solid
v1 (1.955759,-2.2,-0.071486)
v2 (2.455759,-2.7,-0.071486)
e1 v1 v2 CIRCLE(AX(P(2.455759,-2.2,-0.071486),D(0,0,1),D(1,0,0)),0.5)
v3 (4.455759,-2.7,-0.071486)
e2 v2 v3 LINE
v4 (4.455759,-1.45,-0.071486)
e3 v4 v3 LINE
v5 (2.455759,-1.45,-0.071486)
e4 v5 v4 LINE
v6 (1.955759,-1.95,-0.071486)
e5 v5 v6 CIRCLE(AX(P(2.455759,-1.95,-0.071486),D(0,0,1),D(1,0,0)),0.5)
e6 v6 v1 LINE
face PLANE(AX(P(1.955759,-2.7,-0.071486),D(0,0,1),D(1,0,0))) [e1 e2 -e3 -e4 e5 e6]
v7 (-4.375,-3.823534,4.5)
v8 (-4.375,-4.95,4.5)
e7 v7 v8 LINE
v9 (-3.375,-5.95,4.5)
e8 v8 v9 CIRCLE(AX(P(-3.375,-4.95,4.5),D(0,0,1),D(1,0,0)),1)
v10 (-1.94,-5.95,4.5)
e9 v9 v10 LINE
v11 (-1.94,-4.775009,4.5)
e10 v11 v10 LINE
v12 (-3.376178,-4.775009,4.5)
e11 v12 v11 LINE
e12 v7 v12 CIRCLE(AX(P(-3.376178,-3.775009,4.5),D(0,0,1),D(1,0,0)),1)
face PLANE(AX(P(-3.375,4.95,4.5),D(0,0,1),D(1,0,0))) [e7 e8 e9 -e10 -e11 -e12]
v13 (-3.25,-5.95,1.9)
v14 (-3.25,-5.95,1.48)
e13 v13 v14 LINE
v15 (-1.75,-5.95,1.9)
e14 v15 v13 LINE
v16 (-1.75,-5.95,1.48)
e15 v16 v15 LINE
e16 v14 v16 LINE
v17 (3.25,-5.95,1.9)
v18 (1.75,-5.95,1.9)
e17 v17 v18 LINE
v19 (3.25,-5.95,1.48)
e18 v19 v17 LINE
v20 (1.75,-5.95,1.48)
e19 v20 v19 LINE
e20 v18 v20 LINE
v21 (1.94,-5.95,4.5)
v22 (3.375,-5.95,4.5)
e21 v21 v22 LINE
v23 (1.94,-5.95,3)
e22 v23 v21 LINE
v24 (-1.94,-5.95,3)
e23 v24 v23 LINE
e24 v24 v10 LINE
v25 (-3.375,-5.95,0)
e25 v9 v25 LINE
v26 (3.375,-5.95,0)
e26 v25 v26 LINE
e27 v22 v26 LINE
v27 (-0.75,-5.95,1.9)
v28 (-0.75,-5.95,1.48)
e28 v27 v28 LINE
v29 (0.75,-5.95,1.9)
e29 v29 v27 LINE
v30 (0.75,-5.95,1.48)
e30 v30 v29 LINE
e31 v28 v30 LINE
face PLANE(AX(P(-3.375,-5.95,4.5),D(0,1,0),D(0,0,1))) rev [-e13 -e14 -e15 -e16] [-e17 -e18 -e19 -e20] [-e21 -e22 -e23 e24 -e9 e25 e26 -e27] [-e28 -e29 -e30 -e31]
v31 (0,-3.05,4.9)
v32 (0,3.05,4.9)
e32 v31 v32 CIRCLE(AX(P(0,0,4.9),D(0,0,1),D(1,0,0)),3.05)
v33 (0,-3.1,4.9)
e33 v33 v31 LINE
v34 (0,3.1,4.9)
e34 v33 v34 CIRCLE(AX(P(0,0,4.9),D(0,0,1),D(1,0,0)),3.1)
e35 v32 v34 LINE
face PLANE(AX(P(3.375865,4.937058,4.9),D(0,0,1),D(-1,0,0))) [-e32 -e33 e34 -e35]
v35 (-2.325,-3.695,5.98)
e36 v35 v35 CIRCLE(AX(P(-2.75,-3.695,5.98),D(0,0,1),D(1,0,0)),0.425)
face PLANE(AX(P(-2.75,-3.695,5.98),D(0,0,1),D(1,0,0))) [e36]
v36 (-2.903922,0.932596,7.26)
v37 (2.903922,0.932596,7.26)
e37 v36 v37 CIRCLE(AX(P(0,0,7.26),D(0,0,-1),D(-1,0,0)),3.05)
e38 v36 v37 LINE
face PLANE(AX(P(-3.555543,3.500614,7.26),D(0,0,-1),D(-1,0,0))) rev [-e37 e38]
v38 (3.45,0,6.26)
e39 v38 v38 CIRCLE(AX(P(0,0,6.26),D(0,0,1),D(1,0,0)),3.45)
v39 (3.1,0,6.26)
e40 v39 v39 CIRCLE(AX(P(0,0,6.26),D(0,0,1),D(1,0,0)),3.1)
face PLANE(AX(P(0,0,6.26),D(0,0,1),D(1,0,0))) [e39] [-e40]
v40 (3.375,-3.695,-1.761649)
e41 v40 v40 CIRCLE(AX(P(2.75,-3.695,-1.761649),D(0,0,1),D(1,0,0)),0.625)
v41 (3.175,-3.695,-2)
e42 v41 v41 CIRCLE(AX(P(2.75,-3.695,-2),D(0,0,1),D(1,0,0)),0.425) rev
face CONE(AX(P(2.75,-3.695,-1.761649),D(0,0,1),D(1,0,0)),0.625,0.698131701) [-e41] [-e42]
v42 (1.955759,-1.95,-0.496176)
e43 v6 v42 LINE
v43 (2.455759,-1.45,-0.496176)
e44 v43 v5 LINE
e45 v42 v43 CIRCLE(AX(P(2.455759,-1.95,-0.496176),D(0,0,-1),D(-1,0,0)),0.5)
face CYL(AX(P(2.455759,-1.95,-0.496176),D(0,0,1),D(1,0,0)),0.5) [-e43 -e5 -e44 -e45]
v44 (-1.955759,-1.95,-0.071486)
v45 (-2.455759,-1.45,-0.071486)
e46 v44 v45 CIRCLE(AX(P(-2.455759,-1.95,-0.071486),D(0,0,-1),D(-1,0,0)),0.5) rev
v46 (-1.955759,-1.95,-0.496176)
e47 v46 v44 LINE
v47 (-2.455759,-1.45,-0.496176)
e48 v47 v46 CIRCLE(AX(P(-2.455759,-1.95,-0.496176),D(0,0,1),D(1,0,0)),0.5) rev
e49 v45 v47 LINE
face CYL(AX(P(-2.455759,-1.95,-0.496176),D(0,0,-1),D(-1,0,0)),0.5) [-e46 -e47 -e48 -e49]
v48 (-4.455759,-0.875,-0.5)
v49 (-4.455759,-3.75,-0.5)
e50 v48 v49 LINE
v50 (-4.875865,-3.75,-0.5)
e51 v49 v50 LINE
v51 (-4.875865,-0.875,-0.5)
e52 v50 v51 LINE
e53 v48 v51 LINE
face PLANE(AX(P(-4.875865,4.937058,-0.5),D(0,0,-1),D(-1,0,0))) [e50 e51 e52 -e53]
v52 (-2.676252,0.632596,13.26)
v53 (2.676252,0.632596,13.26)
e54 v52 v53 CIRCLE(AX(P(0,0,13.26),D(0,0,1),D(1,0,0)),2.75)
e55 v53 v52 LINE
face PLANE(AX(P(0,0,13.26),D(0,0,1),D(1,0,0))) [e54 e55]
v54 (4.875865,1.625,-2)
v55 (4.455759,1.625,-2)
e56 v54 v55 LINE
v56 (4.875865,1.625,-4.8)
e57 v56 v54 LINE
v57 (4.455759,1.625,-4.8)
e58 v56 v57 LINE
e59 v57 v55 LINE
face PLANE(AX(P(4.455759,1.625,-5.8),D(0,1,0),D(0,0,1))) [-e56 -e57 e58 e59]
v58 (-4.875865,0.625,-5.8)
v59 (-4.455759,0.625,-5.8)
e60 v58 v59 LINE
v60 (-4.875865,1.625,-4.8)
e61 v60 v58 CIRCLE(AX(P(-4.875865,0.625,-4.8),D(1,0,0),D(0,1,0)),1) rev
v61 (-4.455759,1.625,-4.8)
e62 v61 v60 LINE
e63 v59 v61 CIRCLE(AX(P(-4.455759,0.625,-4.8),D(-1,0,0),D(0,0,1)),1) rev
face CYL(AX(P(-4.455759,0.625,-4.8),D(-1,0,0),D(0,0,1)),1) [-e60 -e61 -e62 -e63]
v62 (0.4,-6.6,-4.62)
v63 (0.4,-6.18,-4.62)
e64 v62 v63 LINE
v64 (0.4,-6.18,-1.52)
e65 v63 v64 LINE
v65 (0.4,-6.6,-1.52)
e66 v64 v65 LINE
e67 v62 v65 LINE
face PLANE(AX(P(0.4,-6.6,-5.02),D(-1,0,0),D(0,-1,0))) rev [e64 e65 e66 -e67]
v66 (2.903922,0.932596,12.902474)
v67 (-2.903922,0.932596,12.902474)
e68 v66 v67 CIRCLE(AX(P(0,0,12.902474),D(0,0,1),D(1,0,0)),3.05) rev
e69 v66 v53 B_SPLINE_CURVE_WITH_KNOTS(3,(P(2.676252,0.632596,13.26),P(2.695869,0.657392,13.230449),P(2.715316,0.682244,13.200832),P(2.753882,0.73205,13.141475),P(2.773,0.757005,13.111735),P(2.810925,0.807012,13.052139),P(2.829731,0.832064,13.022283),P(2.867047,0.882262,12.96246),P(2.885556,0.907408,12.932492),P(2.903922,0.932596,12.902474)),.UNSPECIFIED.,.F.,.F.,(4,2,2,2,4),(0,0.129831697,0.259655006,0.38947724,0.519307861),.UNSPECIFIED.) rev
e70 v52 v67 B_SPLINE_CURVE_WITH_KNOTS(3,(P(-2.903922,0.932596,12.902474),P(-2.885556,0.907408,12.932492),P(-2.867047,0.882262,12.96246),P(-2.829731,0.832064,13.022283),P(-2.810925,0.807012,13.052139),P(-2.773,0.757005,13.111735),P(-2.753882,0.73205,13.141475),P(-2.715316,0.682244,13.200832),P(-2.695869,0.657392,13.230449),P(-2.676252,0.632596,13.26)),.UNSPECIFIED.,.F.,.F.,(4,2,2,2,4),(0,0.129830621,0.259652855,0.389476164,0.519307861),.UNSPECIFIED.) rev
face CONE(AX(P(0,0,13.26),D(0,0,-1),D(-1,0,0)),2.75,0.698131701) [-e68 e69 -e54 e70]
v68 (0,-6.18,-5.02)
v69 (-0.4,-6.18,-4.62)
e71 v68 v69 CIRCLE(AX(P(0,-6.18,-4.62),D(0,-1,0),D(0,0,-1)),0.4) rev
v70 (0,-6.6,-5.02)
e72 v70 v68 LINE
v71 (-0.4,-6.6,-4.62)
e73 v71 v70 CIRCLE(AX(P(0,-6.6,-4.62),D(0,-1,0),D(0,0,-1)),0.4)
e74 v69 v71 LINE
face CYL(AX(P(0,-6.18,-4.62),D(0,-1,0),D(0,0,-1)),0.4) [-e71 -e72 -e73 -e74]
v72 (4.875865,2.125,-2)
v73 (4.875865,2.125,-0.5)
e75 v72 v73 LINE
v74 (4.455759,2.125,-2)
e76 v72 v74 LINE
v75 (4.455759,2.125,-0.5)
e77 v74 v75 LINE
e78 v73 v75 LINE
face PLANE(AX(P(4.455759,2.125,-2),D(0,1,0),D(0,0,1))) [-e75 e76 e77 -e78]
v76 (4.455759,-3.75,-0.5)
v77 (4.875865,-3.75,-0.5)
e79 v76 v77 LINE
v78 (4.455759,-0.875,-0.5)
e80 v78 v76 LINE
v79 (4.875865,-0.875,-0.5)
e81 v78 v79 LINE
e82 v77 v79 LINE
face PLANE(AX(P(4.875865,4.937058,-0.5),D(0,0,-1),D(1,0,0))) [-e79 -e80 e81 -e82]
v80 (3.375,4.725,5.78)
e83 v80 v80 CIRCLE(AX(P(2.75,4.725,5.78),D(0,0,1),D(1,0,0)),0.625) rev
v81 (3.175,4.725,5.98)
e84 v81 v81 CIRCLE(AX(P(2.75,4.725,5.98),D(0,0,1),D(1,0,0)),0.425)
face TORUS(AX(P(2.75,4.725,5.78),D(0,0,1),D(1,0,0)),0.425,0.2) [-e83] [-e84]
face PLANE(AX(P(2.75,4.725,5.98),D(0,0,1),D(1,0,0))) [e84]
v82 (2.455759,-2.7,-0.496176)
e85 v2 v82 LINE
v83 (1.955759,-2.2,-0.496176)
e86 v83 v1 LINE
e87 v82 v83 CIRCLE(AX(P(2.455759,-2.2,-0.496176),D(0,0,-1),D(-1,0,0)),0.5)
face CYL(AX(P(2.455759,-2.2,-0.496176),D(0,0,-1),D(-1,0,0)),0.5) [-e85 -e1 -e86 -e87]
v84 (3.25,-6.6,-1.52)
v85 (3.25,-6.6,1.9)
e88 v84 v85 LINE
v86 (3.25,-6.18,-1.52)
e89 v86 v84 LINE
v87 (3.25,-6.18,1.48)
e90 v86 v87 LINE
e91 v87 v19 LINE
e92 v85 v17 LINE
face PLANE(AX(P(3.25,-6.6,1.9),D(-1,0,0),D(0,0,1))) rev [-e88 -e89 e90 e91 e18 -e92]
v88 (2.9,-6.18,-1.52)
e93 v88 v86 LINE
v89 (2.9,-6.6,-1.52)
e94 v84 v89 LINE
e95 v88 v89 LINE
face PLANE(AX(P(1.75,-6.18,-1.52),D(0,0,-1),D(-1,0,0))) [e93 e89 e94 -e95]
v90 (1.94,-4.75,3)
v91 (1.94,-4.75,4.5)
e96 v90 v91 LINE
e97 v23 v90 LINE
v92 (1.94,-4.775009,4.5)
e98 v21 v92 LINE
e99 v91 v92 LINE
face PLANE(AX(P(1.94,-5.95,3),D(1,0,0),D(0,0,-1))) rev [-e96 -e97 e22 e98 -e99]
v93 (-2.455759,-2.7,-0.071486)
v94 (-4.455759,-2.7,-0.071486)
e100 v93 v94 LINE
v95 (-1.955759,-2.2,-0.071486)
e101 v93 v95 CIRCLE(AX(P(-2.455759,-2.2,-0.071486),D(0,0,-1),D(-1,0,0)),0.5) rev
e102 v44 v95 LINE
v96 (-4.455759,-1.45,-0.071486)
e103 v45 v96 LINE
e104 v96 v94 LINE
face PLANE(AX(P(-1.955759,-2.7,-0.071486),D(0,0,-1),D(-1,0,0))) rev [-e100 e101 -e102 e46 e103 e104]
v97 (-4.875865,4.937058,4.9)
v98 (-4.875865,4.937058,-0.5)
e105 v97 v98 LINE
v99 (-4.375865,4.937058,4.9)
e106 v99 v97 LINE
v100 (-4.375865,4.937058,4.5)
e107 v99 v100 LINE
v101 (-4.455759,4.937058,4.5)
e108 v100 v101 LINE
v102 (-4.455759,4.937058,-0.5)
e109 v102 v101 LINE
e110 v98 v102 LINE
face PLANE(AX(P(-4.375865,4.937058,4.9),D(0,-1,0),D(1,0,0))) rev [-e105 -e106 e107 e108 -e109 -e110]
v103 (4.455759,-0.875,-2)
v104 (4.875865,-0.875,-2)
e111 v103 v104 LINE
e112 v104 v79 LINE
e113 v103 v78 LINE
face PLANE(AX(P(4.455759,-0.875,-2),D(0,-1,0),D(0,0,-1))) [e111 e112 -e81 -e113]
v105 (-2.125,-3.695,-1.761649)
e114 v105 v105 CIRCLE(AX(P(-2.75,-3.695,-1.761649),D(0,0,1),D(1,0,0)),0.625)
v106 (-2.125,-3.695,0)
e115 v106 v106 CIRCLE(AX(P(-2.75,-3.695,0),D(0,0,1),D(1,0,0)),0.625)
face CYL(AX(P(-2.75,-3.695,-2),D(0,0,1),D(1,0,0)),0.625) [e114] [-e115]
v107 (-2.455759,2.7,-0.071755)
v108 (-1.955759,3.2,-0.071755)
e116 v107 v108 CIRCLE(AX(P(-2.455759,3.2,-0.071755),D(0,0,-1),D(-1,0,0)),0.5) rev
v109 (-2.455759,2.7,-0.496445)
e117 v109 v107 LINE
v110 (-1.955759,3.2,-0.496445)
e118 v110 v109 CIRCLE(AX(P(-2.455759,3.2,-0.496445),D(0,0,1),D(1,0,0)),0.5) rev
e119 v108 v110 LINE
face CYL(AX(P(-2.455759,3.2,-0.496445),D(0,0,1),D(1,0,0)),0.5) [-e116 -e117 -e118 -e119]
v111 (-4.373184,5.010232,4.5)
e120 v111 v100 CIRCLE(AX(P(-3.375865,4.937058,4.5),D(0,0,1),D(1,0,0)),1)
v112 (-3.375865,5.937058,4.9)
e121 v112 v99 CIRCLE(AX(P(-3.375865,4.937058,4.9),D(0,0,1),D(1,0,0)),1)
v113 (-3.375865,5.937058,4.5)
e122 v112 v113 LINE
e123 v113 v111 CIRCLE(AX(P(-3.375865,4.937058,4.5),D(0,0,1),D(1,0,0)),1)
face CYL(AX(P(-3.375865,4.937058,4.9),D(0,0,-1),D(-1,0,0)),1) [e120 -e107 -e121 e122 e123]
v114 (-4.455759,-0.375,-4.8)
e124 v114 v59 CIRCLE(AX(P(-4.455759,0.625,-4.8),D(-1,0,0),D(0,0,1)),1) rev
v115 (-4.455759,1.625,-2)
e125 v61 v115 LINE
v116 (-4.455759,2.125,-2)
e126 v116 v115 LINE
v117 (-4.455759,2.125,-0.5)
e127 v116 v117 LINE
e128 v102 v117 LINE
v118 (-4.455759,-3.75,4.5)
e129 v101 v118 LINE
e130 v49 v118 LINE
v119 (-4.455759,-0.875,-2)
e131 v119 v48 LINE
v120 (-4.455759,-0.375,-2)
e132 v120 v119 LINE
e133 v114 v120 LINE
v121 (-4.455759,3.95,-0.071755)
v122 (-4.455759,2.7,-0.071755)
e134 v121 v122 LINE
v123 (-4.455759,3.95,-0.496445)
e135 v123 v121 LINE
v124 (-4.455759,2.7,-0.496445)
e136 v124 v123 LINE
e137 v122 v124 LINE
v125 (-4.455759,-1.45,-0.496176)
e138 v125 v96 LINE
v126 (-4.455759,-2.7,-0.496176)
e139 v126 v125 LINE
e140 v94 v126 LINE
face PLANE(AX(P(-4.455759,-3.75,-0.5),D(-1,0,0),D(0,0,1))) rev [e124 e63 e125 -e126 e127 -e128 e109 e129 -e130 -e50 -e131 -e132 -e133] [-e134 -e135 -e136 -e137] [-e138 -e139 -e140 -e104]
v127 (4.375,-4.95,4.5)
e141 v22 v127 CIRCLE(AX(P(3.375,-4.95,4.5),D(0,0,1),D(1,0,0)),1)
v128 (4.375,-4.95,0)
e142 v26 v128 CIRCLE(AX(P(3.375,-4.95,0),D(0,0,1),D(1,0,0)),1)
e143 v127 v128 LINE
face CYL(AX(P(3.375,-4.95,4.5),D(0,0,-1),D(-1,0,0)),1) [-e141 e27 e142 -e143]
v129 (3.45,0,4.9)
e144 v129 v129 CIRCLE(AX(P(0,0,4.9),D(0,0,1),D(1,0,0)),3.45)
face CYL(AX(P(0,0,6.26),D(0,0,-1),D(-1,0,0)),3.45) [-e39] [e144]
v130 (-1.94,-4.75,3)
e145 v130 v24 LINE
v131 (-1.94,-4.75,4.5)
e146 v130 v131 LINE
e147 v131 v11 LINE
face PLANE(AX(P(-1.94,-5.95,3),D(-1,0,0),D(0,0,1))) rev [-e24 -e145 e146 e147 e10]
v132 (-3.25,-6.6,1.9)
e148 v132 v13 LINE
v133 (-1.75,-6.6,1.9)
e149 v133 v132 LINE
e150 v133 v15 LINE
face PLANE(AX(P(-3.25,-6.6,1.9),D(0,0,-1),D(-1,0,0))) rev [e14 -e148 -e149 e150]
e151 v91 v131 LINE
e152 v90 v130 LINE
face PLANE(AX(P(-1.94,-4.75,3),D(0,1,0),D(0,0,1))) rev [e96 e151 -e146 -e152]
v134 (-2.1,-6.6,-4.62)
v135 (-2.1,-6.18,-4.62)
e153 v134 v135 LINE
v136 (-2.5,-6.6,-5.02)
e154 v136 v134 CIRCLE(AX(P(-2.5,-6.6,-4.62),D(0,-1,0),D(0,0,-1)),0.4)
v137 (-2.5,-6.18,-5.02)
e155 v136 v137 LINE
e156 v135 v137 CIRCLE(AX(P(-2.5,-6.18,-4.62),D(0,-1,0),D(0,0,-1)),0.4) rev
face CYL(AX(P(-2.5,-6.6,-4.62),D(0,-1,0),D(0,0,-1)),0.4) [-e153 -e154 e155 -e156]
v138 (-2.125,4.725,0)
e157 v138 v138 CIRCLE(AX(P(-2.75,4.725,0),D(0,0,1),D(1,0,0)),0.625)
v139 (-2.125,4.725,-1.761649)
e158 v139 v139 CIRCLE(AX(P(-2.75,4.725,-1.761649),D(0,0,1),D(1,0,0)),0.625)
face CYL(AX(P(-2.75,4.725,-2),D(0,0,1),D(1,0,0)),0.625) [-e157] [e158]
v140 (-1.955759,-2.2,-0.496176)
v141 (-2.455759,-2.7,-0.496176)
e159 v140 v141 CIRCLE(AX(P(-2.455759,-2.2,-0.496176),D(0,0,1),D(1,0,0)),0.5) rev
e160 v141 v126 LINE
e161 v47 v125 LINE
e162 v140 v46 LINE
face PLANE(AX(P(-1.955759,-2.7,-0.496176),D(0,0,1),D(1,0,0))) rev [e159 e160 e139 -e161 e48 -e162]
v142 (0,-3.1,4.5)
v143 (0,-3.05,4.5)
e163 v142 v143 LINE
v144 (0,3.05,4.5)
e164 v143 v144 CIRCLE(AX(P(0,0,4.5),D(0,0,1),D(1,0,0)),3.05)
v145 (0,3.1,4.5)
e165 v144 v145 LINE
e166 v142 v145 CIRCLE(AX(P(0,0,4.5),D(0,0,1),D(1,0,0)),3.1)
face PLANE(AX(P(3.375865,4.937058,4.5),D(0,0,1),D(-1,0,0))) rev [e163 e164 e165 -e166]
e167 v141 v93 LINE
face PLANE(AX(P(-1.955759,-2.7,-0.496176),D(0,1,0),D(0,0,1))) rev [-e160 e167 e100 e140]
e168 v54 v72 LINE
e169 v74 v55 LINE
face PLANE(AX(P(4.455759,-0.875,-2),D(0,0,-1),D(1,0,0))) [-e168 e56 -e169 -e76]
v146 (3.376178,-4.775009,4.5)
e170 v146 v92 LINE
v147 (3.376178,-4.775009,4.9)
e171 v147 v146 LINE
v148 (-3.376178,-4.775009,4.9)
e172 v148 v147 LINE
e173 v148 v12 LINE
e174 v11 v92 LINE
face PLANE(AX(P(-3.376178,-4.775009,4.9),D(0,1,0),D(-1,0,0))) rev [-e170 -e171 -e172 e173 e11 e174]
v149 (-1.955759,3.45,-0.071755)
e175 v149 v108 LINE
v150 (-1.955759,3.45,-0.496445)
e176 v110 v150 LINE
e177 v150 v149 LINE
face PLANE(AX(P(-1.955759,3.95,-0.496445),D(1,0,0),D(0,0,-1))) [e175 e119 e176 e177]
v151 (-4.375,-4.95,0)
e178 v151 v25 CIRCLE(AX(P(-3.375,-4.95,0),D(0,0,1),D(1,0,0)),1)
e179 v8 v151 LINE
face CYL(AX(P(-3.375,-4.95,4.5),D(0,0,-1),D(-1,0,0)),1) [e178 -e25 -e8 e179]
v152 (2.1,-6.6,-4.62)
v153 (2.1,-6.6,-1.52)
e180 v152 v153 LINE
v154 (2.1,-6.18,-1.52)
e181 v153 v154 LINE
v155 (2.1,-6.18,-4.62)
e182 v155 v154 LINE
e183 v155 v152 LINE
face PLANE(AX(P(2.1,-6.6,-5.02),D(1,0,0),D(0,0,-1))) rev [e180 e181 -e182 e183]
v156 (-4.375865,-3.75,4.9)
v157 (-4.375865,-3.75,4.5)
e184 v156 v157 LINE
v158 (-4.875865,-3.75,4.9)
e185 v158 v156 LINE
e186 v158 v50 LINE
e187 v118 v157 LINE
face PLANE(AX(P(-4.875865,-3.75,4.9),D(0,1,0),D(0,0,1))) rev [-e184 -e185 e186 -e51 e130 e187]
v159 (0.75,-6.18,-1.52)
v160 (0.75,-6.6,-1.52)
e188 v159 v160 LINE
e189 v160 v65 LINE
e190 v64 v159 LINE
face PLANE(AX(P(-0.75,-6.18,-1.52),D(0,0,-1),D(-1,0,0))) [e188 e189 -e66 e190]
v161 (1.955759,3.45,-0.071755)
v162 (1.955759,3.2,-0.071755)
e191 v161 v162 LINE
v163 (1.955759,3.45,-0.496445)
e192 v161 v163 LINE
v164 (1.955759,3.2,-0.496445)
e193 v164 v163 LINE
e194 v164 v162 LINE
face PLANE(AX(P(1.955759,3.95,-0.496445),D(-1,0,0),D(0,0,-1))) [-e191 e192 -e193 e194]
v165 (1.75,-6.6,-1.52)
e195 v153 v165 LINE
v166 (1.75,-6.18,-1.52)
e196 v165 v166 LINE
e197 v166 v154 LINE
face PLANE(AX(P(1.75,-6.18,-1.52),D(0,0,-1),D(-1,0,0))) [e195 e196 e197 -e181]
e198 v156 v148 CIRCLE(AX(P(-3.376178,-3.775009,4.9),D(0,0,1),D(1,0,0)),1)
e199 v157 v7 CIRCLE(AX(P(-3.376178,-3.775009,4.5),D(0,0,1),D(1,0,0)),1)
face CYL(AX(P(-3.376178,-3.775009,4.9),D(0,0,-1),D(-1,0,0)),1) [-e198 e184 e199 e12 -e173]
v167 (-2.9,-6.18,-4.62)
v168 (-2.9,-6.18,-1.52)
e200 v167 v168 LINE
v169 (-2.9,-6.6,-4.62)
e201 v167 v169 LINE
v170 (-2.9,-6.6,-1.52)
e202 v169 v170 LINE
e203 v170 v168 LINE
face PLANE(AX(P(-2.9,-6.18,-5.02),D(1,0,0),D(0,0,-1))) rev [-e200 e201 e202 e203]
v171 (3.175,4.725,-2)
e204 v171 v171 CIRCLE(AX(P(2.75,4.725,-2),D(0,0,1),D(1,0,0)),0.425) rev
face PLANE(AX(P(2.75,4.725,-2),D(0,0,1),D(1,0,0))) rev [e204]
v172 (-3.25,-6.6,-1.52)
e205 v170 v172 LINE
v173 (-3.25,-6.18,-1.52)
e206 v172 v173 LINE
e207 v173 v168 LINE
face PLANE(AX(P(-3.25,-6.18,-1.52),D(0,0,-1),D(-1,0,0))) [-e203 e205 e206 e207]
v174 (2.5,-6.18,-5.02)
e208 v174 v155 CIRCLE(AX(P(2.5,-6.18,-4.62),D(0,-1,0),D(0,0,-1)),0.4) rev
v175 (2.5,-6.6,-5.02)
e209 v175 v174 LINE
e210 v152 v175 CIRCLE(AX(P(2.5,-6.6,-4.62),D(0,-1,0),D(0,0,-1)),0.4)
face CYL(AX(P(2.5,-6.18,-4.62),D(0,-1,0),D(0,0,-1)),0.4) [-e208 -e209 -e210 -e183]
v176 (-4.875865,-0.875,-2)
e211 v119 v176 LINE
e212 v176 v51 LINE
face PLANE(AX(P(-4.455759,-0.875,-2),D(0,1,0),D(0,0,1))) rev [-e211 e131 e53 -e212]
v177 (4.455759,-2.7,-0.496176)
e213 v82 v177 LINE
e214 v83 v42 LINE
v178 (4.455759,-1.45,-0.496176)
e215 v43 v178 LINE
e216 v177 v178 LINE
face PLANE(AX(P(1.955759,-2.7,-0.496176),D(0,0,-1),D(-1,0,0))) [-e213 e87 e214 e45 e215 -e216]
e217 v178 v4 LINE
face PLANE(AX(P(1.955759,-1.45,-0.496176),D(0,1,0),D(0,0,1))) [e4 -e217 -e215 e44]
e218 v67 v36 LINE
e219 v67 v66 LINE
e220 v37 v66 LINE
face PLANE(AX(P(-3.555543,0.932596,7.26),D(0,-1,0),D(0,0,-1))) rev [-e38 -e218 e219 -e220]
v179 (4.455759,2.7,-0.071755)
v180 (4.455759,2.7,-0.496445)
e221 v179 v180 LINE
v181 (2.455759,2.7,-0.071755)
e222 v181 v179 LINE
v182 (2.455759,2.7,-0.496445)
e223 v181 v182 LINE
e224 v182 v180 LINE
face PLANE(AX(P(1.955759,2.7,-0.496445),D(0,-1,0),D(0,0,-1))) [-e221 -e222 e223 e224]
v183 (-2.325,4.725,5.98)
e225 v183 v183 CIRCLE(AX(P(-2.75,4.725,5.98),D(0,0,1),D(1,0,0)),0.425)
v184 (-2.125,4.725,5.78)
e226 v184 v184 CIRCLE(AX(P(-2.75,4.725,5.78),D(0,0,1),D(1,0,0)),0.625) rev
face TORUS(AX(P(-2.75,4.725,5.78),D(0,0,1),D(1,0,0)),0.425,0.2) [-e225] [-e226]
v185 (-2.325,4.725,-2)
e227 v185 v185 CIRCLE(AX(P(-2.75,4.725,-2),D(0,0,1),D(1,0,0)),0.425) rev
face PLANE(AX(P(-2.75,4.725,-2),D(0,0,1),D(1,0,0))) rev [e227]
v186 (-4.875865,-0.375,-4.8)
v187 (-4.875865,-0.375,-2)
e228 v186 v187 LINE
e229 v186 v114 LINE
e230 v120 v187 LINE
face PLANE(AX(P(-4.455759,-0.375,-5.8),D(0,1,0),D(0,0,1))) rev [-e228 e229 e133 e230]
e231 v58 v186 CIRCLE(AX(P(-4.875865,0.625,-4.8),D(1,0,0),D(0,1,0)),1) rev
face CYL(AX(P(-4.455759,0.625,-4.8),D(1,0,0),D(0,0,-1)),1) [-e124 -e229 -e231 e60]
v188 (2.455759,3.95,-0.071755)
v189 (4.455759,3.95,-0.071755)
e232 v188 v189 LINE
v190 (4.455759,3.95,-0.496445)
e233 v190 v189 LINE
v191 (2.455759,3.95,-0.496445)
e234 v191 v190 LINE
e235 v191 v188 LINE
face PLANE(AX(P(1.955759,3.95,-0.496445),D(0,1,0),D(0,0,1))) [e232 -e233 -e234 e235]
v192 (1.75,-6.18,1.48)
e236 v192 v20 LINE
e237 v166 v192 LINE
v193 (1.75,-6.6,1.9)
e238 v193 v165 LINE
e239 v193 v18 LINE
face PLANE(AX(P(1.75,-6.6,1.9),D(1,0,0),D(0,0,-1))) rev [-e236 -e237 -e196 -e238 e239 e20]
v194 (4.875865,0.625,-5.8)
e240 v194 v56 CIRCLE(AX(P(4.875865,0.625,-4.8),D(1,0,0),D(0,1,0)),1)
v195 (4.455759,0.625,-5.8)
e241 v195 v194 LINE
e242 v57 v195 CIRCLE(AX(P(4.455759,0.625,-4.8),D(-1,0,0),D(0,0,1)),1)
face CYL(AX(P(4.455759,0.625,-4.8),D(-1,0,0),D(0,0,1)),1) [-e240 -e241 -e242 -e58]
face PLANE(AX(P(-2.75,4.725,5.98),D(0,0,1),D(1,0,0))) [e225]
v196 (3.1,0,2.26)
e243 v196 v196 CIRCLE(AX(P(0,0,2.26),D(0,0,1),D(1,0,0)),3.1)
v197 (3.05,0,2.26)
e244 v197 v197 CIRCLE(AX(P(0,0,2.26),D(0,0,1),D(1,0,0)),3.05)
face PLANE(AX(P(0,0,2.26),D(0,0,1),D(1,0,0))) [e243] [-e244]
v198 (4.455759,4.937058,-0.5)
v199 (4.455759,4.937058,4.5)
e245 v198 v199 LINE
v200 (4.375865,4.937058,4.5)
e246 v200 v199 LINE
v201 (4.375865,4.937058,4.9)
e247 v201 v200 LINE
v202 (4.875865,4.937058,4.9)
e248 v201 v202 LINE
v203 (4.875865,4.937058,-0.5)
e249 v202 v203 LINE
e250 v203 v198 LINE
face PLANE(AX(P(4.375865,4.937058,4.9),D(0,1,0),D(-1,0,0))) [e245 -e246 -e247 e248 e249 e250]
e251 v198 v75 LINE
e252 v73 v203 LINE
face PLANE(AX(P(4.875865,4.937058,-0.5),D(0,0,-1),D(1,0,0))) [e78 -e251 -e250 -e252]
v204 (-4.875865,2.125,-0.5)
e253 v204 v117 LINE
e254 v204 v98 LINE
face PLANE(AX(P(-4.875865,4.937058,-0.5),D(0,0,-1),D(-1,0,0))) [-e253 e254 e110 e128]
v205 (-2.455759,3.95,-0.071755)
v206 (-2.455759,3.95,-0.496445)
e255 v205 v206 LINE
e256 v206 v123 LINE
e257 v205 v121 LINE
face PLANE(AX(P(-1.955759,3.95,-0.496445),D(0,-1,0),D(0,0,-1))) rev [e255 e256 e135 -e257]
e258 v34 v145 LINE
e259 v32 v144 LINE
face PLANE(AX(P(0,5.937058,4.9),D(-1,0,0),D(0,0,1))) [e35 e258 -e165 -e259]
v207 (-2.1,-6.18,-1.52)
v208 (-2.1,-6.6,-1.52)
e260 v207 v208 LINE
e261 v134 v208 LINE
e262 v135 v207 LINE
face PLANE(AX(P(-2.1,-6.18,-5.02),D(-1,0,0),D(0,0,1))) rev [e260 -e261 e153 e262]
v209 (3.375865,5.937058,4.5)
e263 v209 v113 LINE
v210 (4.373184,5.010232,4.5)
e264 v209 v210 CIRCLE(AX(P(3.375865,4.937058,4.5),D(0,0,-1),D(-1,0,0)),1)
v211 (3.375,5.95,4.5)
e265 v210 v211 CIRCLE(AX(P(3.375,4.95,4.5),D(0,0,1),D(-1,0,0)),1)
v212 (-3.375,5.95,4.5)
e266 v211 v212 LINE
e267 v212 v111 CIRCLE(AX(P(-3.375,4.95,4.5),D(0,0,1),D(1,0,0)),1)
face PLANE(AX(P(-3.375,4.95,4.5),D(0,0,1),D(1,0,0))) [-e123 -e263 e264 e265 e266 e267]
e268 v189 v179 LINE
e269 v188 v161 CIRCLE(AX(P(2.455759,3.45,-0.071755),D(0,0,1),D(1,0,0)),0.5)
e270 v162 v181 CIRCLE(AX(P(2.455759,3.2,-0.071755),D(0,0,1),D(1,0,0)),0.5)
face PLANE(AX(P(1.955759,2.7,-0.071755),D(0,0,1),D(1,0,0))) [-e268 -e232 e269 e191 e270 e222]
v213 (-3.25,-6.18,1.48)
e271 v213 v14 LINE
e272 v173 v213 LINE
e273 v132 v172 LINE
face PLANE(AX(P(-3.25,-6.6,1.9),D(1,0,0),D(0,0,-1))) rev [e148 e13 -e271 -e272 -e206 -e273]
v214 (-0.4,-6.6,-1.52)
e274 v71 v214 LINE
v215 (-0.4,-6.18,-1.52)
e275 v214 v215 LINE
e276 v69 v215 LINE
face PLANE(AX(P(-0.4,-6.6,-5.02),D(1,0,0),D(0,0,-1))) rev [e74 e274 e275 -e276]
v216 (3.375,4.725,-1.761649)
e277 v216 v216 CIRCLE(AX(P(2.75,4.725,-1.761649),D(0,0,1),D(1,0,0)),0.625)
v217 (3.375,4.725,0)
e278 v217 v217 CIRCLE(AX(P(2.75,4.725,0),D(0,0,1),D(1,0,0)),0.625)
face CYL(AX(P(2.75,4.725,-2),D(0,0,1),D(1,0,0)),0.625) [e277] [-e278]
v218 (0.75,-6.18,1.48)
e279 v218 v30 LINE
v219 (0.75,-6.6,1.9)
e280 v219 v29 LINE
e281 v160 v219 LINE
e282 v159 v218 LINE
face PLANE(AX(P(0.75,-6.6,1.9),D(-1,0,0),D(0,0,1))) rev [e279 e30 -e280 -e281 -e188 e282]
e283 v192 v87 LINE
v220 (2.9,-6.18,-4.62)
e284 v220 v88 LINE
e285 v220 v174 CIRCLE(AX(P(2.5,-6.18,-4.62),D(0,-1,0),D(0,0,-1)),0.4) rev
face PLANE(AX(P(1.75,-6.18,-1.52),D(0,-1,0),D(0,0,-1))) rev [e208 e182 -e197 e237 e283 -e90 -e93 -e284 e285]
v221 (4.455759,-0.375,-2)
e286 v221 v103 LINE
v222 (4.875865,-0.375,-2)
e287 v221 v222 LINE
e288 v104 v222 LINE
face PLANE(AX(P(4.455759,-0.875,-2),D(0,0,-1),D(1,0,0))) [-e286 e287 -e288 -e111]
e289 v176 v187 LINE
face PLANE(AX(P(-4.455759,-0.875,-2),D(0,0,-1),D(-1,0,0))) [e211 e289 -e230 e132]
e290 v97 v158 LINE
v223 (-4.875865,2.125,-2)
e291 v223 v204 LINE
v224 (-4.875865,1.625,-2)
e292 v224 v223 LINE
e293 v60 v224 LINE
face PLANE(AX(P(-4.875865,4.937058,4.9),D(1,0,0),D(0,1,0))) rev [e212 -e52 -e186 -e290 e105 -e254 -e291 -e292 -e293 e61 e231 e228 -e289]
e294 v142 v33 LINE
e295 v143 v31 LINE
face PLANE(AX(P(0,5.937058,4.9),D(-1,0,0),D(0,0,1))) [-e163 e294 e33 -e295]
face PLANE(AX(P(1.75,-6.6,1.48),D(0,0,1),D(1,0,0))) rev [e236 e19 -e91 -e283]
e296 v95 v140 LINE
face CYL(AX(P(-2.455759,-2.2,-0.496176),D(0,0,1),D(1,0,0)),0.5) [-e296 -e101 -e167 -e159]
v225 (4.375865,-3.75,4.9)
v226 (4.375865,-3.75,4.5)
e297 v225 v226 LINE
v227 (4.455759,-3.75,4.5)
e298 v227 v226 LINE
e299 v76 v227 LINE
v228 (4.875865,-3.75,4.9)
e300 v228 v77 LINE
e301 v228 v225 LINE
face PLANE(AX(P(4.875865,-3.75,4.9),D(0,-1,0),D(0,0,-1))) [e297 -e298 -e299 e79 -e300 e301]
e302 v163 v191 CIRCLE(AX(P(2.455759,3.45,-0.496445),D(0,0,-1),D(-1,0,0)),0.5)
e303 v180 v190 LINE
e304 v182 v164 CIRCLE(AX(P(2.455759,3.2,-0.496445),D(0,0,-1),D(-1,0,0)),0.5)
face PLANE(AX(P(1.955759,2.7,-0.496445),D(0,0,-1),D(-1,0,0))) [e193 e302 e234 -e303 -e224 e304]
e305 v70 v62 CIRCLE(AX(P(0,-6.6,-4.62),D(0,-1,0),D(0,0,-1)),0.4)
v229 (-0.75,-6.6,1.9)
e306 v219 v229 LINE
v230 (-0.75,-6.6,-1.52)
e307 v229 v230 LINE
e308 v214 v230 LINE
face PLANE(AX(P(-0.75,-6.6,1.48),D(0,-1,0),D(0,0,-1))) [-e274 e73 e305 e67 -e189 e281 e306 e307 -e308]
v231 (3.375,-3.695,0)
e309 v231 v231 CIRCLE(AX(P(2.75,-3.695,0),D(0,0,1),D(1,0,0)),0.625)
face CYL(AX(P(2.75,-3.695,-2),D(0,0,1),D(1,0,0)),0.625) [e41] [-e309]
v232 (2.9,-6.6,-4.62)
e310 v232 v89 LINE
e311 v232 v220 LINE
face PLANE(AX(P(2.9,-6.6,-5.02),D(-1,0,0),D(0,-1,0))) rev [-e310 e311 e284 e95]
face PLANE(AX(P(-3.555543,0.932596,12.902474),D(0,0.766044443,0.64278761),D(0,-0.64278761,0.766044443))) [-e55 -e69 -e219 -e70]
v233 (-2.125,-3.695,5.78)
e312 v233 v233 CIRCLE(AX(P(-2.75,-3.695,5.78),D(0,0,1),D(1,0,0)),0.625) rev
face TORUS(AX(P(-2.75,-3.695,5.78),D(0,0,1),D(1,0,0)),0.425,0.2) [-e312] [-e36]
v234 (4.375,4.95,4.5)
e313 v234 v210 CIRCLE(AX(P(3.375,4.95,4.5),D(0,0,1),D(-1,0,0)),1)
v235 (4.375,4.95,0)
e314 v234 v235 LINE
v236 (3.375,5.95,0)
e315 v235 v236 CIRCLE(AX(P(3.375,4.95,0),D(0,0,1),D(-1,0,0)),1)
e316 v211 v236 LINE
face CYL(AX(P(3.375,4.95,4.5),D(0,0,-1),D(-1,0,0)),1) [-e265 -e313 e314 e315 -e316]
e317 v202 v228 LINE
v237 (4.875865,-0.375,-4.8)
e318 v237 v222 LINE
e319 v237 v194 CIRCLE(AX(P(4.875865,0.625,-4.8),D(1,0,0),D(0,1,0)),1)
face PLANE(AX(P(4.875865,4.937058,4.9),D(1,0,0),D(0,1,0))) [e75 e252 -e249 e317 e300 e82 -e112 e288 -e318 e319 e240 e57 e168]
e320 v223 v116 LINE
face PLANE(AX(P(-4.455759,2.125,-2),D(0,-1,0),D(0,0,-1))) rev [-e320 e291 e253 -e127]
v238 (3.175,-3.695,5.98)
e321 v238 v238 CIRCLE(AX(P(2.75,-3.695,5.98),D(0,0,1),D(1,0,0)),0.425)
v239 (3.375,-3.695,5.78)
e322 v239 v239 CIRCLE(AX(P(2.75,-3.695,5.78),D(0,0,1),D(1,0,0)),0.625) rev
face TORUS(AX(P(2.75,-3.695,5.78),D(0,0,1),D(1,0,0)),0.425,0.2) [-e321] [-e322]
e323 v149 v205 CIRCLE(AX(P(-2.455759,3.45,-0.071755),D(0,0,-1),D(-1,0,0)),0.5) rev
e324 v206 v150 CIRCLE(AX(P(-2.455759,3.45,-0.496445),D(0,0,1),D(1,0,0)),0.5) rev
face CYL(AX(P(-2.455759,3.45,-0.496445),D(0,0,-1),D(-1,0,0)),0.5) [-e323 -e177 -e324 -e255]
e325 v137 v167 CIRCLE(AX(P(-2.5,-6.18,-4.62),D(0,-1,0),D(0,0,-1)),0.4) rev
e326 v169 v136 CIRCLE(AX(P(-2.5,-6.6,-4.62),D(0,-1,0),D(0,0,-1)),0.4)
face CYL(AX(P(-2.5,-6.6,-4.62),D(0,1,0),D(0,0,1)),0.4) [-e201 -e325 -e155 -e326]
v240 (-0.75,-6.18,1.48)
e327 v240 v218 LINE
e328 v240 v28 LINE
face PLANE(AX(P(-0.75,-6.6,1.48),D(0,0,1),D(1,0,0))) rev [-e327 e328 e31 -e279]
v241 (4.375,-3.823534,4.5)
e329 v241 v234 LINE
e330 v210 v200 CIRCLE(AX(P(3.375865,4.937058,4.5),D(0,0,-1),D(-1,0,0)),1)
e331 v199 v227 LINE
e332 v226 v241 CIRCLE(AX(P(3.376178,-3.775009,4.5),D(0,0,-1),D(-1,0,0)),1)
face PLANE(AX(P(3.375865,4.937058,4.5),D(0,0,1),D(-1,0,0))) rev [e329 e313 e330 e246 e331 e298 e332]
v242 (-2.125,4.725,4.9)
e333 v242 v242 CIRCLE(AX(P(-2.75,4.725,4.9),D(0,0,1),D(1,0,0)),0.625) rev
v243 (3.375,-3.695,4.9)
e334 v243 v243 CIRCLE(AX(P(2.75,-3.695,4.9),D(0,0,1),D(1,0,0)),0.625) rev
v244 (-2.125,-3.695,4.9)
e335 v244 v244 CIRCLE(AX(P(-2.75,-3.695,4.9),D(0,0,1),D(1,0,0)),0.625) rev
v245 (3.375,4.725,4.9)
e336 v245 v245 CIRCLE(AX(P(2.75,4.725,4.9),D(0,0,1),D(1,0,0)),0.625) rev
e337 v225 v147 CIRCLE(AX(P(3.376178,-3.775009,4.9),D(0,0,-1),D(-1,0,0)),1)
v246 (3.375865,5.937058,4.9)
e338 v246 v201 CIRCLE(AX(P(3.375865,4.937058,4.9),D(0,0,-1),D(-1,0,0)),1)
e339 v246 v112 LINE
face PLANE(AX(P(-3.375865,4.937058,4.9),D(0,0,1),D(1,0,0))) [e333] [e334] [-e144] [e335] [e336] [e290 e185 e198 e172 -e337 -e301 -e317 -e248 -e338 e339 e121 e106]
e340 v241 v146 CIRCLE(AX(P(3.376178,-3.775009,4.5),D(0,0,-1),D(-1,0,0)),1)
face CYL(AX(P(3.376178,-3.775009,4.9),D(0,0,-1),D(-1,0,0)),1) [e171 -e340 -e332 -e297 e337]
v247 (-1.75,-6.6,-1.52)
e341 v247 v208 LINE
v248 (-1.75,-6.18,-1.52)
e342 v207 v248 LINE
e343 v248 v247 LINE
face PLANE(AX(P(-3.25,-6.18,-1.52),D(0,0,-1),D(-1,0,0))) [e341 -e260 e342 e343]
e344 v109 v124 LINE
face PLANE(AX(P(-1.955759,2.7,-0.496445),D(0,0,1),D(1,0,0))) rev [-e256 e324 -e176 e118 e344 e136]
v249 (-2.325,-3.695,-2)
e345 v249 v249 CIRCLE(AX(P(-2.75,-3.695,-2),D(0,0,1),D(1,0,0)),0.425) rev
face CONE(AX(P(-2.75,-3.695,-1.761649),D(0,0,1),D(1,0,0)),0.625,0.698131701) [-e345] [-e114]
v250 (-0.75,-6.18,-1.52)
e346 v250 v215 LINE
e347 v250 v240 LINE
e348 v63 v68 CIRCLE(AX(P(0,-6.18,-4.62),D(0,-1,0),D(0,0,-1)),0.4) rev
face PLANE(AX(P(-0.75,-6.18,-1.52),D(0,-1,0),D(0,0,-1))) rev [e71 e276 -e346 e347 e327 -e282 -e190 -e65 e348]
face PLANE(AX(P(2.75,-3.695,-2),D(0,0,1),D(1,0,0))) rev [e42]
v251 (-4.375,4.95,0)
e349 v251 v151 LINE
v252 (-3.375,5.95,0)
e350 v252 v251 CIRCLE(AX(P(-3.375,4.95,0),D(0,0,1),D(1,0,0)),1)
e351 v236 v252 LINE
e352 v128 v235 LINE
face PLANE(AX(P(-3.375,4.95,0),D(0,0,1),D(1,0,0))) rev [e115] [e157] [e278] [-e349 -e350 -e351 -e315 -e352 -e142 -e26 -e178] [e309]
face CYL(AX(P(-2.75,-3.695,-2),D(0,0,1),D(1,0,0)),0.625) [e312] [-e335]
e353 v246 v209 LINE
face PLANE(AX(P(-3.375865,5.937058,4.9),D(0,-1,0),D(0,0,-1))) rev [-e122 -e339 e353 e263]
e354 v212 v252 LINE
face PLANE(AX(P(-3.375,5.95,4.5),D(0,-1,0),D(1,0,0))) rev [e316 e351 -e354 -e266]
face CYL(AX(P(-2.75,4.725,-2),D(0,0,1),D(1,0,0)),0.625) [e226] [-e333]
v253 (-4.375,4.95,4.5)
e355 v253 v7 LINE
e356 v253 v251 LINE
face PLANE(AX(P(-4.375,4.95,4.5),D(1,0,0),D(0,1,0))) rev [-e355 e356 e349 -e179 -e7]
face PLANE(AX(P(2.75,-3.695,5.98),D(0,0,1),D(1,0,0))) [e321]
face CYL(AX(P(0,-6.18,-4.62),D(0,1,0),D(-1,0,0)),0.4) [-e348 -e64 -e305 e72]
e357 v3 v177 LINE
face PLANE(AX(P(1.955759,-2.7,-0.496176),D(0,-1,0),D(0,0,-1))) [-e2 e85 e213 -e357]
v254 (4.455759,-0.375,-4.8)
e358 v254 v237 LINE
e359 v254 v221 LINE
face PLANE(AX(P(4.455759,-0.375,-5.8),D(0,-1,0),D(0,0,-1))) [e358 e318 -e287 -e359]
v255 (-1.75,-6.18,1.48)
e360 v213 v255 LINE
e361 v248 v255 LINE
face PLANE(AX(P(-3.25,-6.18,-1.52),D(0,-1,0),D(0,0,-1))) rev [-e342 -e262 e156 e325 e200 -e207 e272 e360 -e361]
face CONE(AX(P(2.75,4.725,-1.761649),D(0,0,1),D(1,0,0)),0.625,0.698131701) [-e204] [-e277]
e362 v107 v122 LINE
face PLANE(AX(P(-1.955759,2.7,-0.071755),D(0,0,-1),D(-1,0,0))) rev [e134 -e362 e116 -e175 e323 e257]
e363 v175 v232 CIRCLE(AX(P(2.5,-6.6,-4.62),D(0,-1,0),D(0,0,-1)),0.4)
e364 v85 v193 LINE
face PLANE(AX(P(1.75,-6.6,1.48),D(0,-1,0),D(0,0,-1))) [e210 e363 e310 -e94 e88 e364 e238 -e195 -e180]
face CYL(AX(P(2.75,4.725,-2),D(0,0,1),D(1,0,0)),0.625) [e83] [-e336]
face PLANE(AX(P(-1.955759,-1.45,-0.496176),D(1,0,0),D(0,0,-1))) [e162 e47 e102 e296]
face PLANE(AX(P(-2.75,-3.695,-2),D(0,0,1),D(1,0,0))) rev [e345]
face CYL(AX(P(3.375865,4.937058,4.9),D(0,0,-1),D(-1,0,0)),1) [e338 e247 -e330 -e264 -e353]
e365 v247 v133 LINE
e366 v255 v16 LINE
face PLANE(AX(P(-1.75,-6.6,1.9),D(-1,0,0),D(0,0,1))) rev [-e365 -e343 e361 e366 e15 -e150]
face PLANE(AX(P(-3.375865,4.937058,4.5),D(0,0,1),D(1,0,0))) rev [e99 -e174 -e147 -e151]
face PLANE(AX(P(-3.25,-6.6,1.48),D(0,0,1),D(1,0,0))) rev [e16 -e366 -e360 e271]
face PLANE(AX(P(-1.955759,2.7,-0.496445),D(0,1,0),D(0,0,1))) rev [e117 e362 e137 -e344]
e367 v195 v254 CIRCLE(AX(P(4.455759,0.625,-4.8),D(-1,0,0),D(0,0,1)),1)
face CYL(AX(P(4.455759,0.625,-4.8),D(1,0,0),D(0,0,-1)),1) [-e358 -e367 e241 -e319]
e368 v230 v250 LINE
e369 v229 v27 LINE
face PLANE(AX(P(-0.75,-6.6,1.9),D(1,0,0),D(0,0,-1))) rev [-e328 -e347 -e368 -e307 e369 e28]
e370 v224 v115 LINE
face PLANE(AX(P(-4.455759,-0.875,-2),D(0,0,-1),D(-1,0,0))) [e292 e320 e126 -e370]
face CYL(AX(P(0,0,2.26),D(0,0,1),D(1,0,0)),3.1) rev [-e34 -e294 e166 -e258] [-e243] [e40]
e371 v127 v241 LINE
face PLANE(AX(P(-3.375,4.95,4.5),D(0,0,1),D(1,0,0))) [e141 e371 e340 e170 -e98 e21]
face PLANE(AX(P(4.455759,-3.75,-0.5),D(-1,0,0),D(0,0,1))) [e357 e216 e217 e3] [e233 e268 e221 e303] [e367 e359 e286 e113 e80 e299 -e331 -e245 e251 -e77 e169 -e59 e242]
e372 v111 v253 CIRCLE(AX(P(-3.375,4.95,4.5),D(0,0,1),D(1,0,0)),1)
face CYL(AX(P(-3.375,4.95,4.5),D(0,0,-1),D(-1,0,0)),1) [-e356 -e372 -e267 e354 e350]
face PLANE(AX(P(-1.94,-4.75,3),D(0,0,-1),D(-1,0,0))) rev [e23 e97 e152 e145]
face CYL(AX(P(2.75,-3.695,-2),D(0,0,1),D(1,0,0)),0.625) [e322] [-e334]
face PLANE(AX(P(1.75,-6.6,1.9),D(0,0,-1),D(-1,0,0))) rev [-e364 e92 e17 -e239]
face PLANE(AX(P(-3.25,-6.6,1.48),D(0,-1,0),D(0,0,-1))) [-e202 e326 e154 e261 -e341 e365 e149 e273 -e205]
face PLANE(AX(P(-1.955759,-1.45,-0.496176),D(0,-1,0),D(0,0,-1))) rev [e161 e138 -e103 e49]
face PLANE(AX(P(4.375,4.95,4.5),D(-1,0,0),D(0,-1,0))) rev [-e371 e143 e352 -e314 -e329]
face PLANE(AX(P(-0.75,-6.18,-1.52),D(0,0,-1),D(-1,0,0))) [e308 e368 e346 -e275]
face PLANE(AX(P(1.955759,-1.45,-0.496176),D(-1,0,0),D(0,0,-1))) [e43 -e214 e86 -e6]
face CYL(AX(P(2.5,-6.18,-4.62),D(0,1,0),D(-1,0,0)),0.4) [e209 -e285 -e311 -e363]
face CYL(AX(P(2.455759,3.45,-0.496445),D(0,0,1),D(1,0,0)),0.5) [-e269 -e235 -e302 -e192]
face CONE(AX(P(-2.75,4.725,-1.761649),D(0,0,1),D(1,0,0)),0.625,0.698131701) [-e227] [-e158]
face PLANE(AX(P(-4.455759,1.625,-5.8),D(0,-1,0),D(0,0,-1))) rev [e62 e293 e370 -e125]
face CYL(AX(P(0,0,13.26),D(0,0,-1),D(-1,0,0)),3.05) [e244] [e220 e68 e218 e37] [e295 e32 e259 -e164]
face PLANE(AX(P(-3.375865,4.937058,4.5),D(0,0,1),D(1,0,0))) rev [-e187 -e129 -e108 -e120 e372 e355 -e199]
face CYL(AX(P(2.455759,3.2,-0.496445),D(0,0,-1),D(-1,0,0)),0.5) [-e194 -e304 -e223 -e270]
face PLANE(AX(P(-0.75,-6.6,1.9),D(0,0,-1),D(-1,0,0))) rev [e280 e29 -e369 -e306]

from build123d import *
from OCP.BRepFilletAPI import BRepFilletAPI_MakeChamfer

# Parameters (mm, degrees)
EXTRUSION1_DEPTH        = 4.5
EXTRUSION2_DEPTH        = 1.48
EXTRUSION2_DEPTH_BACK   = 6.5
ESQUISSE3_R             = 0.625
CONG_1_R                = 0.2
CHANFREIN1_SIZE         = 0.2
CHANFREIN1_SIZE2        = 0.238350719
ESQUISSE4_W             = 3.88
ESQUISSE4_H             = 1.2
ENL_V_MAT_EXTRU_1_DEPTH = 1.5
EXTRUSION3_DEPTH        = 0.4
ESQUISSE8_W             = 0.420106654
ESQUISSE8_H             = 8.687057787
EXTRUSION4_DEPTH        = 5
ESQUISSE9_W             = 0.424689677
ESQUISSE9_H             = 1.25
EXTRUSION5_DEPTH        = 2.5
CONG_3_R                = 0.5
CONG_4_R                = 0.5
ESQUISSE11_R            = 3.45
EXTRUSION6_DEPTH        = 1.36
ESQUISSE12_R            = 3.1
ENL_V_MAT_EXTRU_2_DEPTH = 4
ESQUISSE13_R            = 3.05
EXTRUSION7_DEPTH        = 11
ESQUISSE14_W            = 7.136387573
ESQUISSE14_H            = 2.568018255
ENL_V_MAT_EXTRU_7_DEPTH = 6
CHANFREIN2_SIZE         = 0.3
CHANFREIN2_SIZE2        = 0.357526078
ESQUISSE15_W            = 1.5
ESQUISSE15_H            = 0.42
EXTRUSION8_DEPTH        = 0.65
ESQUISSE16_W            = 1.5
ESQUISSE16_H            = 0.42
EXTRUSION9_DEPTH        = 3
ESQUISSE17_W            = 0.8
ESQUISSE17_H            = 0.42
EXTRUSION10_DEPTH       = 3.5
CONG_5_R                = 0.4
ESQUISSE18_W            = 0.420106654
ESQUISSE18_H            = 3
EXTRUSION11_DEPTH       = 1.5
ESQUISSE19_W            = 0.420106654
ESQUISSE19_H            = 2
EXTRUSION12_DEPTH       = 3.8
CONG_6_R                = 1
CONG_3_OF_SYM_TRIE1_R   = 0.5
CONG_4_OF_SYM_TRIE1_R   = 0.5
CONG_6_OF_SYM_TRIE1_R   = 1


with BuildPart() as part:
    # Esquisse2 → Extrusion1 (new body)
    with BuildSketch(Plane.XY):
        with BuildLine():
            Line((-3.375, 5.95), (3.375, 5.95))
            ThreePointArc((3.375, 5.95), (4.082106781, 5.657106781), (4.375, 4.95))
            Line((4.375, 4.95), (4.375, -4.95))
            ThreePointArc((4.375, -4.95), (4.082106781, -5.657106781), (3.375, -5.95))
            Line((3.375, -5.95), (-3.375, -5.95))
            ThreePointArc((-3.375, -5.95), (-4.082106781, -5.657106781), (-4.375, -4.95))
            Line((-4.375, -4.95), (-4.375, 4.95))
            ThreePointArc((-4.375, 4.95), (-4.082106781, 5.657106781), (-3.375, 5.95))
        make_face()
    extrude(amount=EXTRUSION1_DEPTH)

    # Esquisse3 → Extrusion2 (add, two sides: drawn at the far end of the back side and taken through both)
    with BuildSketch(Plane.XY.offset(4.5).offset(-EXTRUSION2_DEPTH_BACK)):
        with Locations((-2.75, 4.725)):
            Circle(ESQUISSE3_R)
        with Locations((2.75, 4.725)):
            Circle(ESQUISSE3_R)
        with Locations((2.75, -3.695)):
            Circle(ESQUISSE3_R)
        with Locations((-2.75, -3.695)):
            Circle(ESQUISSE3_R)
    extrude(amount=EXTRUSION2_DEPTH + EXTRUSION2_DEPTH_BACK)

    # Congé1
    cong_1_edges = [part.edges().sort_by_distance(p)[0] for p in [
        (-3.375, 4.725, 5.98),
        (2.125, 4.725, 5.98),
        (2.125, -3.695, 5.98),
        (-3.375, -3.695, 5.98),
    ]]
    fillet(cong_1_edges, radius=CONG_1_R)

    # Chanfrein1: one chamfer whose edges measure the first distance from different faces: ONE call of the kernel's chamfer builder (chamfer() names one face for all edges)
    chanfrein1_edges_1 = [part.edges().sort_by_distance(p)[0] for p in [
        (-3.375, 4.725, -2),
    ]]
    chanfrein1_side_1 = [part.faces().sort_by_distance(p)[0] for p in [
        (-2.75, 4.725, -2),
    ]]
    chanfrein1_edges_2 = [part.edges().sort_by_distance(p)[0] for p in [
        (2.125, 4.725, -2),
    ]]
    chanfrein1_side_2 = [part.faces().sort_by_distance(p)[0] for p in [
        (2.75, 4.725, -2),
    ]]
    chanfrein1_edges_3 = [part.edges().sort_by_distance(p)[0] for p in [
        (2.125, -3.695, -2),
    ]]
    chanfrein1_side_3 = [part.faces().sort_by_distance(p)[0] for p in [
        (2.75, -3.695, -2),
    ]]
    chanfrein1_edges_4 = [part.edges().sort_by_distance(p)[0] for p in [
        (-3.375, -3.695, -2),
    ]]
    chanfrein1_side_4 = [part.faces().sort_by_distance(p)[0] for p in [
        (-2.75, -3.695, -2),
    ]]
    chanfrein1 = BRepFilletAPI_MakeChamfer(part.part.solid().wrapped)
    for e in chanfrein1_edges_1:
        chanfrein1.Add(CHANFREIN1_SIZE, CHANFREIN1_SIZE2, e.wrapped, chanfrein1_side_1[0].wrapped)  # the first distance lies on this face
    for e in chanfrein1_edges_2:
        chanfrein1.Add(CHANFREIN1_SIZE, CHANFREIN1_SIZE2, e.wrapped, chanfrein1_side_2[0].wrapped)  # the first distance lies on this face
    for e in chanfrein1_edges_3:
        chanfrein1.Add(CHANFREIN1_SIZE, CHANFREIN1_SIZE2, e.wrapped, chanfrein1_side_3[0].wrapped)  # the first distance lies on this face
    for e in chanfrein1_edges_4:
        chanfrein1.Add(CHANFREIN1_SIZE, CHANFREIN1_SIZE2, e.wrapped, chanfrein1_side_4[0].wrapped)  # the first distance lies on this face
    add(Compound.cast(chanfrein1.Shape()), mode=Mode.REPLACE)

    # Esquisse4 → Enlèv. mat.-Extru.1 (cut)
    with BuildSketch(Plane.XY.offset(4.5)):
        with Locations((0, -5.35)):
            Rectangle(ESQUISSE4_W, ESQUISSE4_H)
    extrude(amount=-ENL_V_MAT_EXTRU_1_DEPTH, mode=Mode.SUBTRACT)

    # Esquisse5 → Extrusion3 (add)
    with BuildSketch(Plane.XY.offset(4.5)):
        with BuildLine():
            Line((-3.375865226, 5.937057787), (0, 5.937057787))
            Line((0, 5.937057787), (0, -4.775009367))
            Line((0, -4.775009367), (-3.376178009, -4.775009367))
            ThreePointArc((-3.376178009, -4.775009367), (-4.092072333, -4.473218015), (-4.375865226, -3.75))
            Line((-4.375865226, -3.75), (-4.875865226, -3.75))
            Line((-4.875865226, -3.75), (-4.875865226, 4.937057787))
            Line((-4.875865226, 4.937057787), (-4.375865226, 4.937057787))
            ThreePointArc((-4.375865226, 4.937057787), (-4.082972007, 5.644164569), (-3.375865226, 5.937057787))
        make_face()
    extrusion3 = extrude(amount=EXTRUSION3_DEPTH)

    # Esquisse8 → Extrusion4 (add)
    with BuildSketch(Plane(origin=(0, 0, 4.5), x_dir=(-1, 0, 0), z_dir=(0, 0, -1))):
        with Locations((4.665811899, 0.593528894)):
            Rectangle(ESQUISSE8_W, ESQUISSE8_H)
    extrusion4 = extrude(amount=EXTRUSION4_DEPTH)

    # Esquisse9 → Extrusion5 (add)
    with BuildSketch(Plane(origin=(-4.455758572, 0, 0), x_dir=(0, 0, -1), z_dir=(1, 0, 0))):
        with Locations((0.283831247, -2.075)):
            Rectangle(ESQUISSE9_W, ESQUISSE9_H)
        with Locations((0.284099775, 3.325)):
            Rectangle(ESQUISSE9_W, ESQUISSE9_H)
    extrusion5 = extrude(amount=EXTRUSION5_DEPTH)

    # Congé3
    cong_3_edges = [part.edges().sort_by_distance(p)[0] for p in [
        (-1.955758572, -1.45, -0.283831246),
        (-1.955758572, -2.7, -0.283831246),
    ]]
    fillet(cong_3_edges, radius=CONG_3_R)

    # Congé4
    cong_4_edges = [part.edges().sort_by_distance(p)[0] for p in [
        (-1.955758572, 3.95, -0.284099776),
        (-1.955758572, 2.7, -0.284099776),
    ]]
    fillet(cong_4_edges, radius=CONG_4_R)

    # Esquisse11 → Extrusion6 (add)
    with BuildSketch(Plane.XY.offset(4.9)):
        with Locations(Location((0, 0, 0), (0, 0, 270))):
            Circle(ESQUISSE11_R)
    extrude(amount=EXTRUSION6_DEPTH)

    # Esquisse12 → Enlèv. mat.-Extru.2 (cut)
    with BuildSketch(Plane.XY.offset(6.26)):
        Circle(ESQUISSE12_R)
    extrude(amount=-ENL_V_MAT_EXTRU_2_DEPTH, mode=Mode.SUBTRACT)

    # Esquisse13 → Extrusion7 (add)
    with BuildSketch(Plane.XY.offset(2.26)):
        Circle(ESQUISSE13_R)
    extrude(amount=EXTRUSION7_DEPTH)

    # Esquisse14 → Enlèv. mat.-Extru.7 (cut)
    with BuildSketch(Plane.XY.offset(13.26)):
        with Locations((0.012650659, 2.216605231)):
            Rectangle(ESQUISSE14_W, ESQUISSE14_H)
    extrude(amount=-ENL_V_MAT_EXTRU_7_DEPTH, mode=Mode.SUBTRACT)

    # Chanfrein2
    chanfrein2_edges = [part.edges().sort_by_distance(p)[0] for p in [
        (-0.471983632, -3.013259274, 13.26),
        (0, 0.932596103, 13.26),
    ]]
    chanfrein2_side = [part.faces().sort_by_distance(p)[0] for p in [
        (0, -0.80773857, 13.26),
    ]]
    chamfer(chanfrein2_edges, length=CHANFREIN2_SIZE, length2=CHANFREIN2_SIZE2, reference=chanfrein2_side[0])

    # Esquisse15 → Extrusion8 (add)
    with BuildSketch(Plane.XZ.offset(5.95)):
        with Locations((0, 1.69)):
            Rectangle(ESQUISSE15_W, ESQUISSE15_H)
        with Locations((2.5, 1.69)):
            Rectangle(ESQUISSE15_W, ESQUISSE15_H)
        with Locations((-2.5, 1.69)):
            Rectangle(ESQUISSE15_W, ESQUISSE15_H)
    extrude(amount=EXTRUSION8_DEPTH)

    # Esquisse16 → Extrusion9 (add)
    with BuildSketch(Plane(origin=(0, 0, 1.48), x_dir=(-1, 0, 0), z_dir=(0, 0, -1))):
        with Locations((2.5, -6.39)):
            Rectangle(ESQUISSE16_W, ESQUISSE16_H)
        with Locations((0, -6.39)):
            Rectangle(ESQUISSE16_W, ESQUISSE16_H)
        with Locations((-2.5, -6.39)):
            Rectangle(ESQUISSE16_W, ESQUISSE16_H)
    extrude(amount=EXTRUSION9_DEPTH)

    # Esquisse17 → Extrusion10 (add)
    with BuildSketch(Plane(origin=(0, 0, -1.52), x_dir=(-1, 0, 0), z_dir=(0, 0, -1))):
        with Locations((2.5, -6.39)):
            Rectangle(ESQUISSE17_W, ESQUISSE17_H)
        with Locations((0, -6.39)):
            Rectangle(ESQUISSE17_W, ESQUISSE17_H)
        with Locations((-2.5, -6.39)):
            Rectangle(ESQUISSE17_W, ESQUISSE17_H)
    extrude(amount=EXTRUSION10_DEPTH)

    # Congé5
    cong_5_edges = [part.edges().sort_by_distance(p)[0] for p in [
        (2.9, -6.39, -5.02),
        (-2.1, -6.39, -5.02),
        (0.4, -6.39, -5.02),
        (-2.9, -6.39, -5.02),
        (-0.4, -6.39, -5.02),
        (2.1, -6.39, -5.02),
    ]]
    fillet(cong_5_edges, radius=CONG_5_R - 0.0001)  # a hair under: the kernel refuses the full size

    # Esquisse18 → Extrusion11 (add)
    with BuildSketch(Plane(origin=(0, 0, -0.5), x_dir=(-1, 0, 0), z_dir=(0, 0, -1))):
        with Locations((4.665811899, 0.625)):
            Rectangle(ESQUISSE18_W, ESQUISSE18_H)
    extrusion11 = extrude(amount=EXTRUSION11_DEPTH)

    # Esquisse19 → Extrusion12 (add)
    with BuildSketch(Plane(origin=(0, 0, -2), x_dir=(-1, 0, 0), z_dir=(0, 0, -1))):
        with Locations((4.665811899, 0.625)):
            Rectangle(ESQUISSE19_W, ESQUISSE19_H)
    extrusion12 = extrude(amount=EXTRUSION12_DEPTH)

    # Congé6
    cong_6_edges = [part.edges().sort_by_distance(p)[0] for p in [
        (-4.665811899, -0.375, -5.8),
        (-4.665811899, 1.625, -5.8),
    ]]
    fillet(cong_6_edges, radius=CONG_6_R - 0.0001)  # a hair under: the kernel refuses the full size

    # Symétrie1: Extrusion3, Extrusion4, Extrusion5, Extrusion11, Extrusion12 across Right Plane
    add(extrusion3.mirror(Plane(origin=(0, 0, 0), x_dir=(0, 0, -1), z_dir=(1, 0, 0))))
    add(extrusion4.mirror(Plane(origin=(0, 0, 0), x_dir=(0, 0, -1), z_dir=(1, 0, 0))))
    add(extrusion5.mirror(Plane(origin=(0, 0, 0), x_dir=(0, 0, -1), z_dir=(1, 0, 0))))
    add(extrusion11.mirror(Plane(origin=(0, 0, 0), x_dir=(0, 0, -1), z_dir=(1, 0, 0))))
    add(extrusion12.mirror(Plane(origin=(0, 0, 0), x_dir=(0, 0, -1), z_dir=(1, 0, 0))))

    # Congé3 of Symétrie1
    cong_3_of_sym_trie1_edges = [part.edges().sort_by_distance(p)[0] for p in [
        (1.955758572, -1.45, -0.283831246),
        (1.955758572, -2.7, -0.283831246),
    ]]
    fillet(cong_3_of_sym_trie1_edges, radius=CONG_3_OF_SYM_TRIE1_R)

    # Congé4 of Symétrie1
    cong_4_of_sym_trie1_edges = [part.edges().sort_by_distance(p)[0] for p in [
        (1.955758572, 3.95, -0.284099776),
        (1.955758572, 2.7, -0.284099776),
    ]]
    fillet(cong_4_of_sym_trie1_edges, radius=CONG_4_OF_SYM_TRIE1_R)

    # Congé6 of Symétrie1
    cong_6_of_sym_trie1_edges = [part.edges().sort_by_distance(p)[0] for p in [
        (4.665811899, -0.375, -5.8),
        (4.665811899, 1.625, -5.8),
    ]]
    fillet(cong_6_of_sym_trie1_edges, radius=CONG_6_OF_SYM_TRIE1_R - 0.0001)  # a hair under: the kernel refuses the full size


solid = part.part
